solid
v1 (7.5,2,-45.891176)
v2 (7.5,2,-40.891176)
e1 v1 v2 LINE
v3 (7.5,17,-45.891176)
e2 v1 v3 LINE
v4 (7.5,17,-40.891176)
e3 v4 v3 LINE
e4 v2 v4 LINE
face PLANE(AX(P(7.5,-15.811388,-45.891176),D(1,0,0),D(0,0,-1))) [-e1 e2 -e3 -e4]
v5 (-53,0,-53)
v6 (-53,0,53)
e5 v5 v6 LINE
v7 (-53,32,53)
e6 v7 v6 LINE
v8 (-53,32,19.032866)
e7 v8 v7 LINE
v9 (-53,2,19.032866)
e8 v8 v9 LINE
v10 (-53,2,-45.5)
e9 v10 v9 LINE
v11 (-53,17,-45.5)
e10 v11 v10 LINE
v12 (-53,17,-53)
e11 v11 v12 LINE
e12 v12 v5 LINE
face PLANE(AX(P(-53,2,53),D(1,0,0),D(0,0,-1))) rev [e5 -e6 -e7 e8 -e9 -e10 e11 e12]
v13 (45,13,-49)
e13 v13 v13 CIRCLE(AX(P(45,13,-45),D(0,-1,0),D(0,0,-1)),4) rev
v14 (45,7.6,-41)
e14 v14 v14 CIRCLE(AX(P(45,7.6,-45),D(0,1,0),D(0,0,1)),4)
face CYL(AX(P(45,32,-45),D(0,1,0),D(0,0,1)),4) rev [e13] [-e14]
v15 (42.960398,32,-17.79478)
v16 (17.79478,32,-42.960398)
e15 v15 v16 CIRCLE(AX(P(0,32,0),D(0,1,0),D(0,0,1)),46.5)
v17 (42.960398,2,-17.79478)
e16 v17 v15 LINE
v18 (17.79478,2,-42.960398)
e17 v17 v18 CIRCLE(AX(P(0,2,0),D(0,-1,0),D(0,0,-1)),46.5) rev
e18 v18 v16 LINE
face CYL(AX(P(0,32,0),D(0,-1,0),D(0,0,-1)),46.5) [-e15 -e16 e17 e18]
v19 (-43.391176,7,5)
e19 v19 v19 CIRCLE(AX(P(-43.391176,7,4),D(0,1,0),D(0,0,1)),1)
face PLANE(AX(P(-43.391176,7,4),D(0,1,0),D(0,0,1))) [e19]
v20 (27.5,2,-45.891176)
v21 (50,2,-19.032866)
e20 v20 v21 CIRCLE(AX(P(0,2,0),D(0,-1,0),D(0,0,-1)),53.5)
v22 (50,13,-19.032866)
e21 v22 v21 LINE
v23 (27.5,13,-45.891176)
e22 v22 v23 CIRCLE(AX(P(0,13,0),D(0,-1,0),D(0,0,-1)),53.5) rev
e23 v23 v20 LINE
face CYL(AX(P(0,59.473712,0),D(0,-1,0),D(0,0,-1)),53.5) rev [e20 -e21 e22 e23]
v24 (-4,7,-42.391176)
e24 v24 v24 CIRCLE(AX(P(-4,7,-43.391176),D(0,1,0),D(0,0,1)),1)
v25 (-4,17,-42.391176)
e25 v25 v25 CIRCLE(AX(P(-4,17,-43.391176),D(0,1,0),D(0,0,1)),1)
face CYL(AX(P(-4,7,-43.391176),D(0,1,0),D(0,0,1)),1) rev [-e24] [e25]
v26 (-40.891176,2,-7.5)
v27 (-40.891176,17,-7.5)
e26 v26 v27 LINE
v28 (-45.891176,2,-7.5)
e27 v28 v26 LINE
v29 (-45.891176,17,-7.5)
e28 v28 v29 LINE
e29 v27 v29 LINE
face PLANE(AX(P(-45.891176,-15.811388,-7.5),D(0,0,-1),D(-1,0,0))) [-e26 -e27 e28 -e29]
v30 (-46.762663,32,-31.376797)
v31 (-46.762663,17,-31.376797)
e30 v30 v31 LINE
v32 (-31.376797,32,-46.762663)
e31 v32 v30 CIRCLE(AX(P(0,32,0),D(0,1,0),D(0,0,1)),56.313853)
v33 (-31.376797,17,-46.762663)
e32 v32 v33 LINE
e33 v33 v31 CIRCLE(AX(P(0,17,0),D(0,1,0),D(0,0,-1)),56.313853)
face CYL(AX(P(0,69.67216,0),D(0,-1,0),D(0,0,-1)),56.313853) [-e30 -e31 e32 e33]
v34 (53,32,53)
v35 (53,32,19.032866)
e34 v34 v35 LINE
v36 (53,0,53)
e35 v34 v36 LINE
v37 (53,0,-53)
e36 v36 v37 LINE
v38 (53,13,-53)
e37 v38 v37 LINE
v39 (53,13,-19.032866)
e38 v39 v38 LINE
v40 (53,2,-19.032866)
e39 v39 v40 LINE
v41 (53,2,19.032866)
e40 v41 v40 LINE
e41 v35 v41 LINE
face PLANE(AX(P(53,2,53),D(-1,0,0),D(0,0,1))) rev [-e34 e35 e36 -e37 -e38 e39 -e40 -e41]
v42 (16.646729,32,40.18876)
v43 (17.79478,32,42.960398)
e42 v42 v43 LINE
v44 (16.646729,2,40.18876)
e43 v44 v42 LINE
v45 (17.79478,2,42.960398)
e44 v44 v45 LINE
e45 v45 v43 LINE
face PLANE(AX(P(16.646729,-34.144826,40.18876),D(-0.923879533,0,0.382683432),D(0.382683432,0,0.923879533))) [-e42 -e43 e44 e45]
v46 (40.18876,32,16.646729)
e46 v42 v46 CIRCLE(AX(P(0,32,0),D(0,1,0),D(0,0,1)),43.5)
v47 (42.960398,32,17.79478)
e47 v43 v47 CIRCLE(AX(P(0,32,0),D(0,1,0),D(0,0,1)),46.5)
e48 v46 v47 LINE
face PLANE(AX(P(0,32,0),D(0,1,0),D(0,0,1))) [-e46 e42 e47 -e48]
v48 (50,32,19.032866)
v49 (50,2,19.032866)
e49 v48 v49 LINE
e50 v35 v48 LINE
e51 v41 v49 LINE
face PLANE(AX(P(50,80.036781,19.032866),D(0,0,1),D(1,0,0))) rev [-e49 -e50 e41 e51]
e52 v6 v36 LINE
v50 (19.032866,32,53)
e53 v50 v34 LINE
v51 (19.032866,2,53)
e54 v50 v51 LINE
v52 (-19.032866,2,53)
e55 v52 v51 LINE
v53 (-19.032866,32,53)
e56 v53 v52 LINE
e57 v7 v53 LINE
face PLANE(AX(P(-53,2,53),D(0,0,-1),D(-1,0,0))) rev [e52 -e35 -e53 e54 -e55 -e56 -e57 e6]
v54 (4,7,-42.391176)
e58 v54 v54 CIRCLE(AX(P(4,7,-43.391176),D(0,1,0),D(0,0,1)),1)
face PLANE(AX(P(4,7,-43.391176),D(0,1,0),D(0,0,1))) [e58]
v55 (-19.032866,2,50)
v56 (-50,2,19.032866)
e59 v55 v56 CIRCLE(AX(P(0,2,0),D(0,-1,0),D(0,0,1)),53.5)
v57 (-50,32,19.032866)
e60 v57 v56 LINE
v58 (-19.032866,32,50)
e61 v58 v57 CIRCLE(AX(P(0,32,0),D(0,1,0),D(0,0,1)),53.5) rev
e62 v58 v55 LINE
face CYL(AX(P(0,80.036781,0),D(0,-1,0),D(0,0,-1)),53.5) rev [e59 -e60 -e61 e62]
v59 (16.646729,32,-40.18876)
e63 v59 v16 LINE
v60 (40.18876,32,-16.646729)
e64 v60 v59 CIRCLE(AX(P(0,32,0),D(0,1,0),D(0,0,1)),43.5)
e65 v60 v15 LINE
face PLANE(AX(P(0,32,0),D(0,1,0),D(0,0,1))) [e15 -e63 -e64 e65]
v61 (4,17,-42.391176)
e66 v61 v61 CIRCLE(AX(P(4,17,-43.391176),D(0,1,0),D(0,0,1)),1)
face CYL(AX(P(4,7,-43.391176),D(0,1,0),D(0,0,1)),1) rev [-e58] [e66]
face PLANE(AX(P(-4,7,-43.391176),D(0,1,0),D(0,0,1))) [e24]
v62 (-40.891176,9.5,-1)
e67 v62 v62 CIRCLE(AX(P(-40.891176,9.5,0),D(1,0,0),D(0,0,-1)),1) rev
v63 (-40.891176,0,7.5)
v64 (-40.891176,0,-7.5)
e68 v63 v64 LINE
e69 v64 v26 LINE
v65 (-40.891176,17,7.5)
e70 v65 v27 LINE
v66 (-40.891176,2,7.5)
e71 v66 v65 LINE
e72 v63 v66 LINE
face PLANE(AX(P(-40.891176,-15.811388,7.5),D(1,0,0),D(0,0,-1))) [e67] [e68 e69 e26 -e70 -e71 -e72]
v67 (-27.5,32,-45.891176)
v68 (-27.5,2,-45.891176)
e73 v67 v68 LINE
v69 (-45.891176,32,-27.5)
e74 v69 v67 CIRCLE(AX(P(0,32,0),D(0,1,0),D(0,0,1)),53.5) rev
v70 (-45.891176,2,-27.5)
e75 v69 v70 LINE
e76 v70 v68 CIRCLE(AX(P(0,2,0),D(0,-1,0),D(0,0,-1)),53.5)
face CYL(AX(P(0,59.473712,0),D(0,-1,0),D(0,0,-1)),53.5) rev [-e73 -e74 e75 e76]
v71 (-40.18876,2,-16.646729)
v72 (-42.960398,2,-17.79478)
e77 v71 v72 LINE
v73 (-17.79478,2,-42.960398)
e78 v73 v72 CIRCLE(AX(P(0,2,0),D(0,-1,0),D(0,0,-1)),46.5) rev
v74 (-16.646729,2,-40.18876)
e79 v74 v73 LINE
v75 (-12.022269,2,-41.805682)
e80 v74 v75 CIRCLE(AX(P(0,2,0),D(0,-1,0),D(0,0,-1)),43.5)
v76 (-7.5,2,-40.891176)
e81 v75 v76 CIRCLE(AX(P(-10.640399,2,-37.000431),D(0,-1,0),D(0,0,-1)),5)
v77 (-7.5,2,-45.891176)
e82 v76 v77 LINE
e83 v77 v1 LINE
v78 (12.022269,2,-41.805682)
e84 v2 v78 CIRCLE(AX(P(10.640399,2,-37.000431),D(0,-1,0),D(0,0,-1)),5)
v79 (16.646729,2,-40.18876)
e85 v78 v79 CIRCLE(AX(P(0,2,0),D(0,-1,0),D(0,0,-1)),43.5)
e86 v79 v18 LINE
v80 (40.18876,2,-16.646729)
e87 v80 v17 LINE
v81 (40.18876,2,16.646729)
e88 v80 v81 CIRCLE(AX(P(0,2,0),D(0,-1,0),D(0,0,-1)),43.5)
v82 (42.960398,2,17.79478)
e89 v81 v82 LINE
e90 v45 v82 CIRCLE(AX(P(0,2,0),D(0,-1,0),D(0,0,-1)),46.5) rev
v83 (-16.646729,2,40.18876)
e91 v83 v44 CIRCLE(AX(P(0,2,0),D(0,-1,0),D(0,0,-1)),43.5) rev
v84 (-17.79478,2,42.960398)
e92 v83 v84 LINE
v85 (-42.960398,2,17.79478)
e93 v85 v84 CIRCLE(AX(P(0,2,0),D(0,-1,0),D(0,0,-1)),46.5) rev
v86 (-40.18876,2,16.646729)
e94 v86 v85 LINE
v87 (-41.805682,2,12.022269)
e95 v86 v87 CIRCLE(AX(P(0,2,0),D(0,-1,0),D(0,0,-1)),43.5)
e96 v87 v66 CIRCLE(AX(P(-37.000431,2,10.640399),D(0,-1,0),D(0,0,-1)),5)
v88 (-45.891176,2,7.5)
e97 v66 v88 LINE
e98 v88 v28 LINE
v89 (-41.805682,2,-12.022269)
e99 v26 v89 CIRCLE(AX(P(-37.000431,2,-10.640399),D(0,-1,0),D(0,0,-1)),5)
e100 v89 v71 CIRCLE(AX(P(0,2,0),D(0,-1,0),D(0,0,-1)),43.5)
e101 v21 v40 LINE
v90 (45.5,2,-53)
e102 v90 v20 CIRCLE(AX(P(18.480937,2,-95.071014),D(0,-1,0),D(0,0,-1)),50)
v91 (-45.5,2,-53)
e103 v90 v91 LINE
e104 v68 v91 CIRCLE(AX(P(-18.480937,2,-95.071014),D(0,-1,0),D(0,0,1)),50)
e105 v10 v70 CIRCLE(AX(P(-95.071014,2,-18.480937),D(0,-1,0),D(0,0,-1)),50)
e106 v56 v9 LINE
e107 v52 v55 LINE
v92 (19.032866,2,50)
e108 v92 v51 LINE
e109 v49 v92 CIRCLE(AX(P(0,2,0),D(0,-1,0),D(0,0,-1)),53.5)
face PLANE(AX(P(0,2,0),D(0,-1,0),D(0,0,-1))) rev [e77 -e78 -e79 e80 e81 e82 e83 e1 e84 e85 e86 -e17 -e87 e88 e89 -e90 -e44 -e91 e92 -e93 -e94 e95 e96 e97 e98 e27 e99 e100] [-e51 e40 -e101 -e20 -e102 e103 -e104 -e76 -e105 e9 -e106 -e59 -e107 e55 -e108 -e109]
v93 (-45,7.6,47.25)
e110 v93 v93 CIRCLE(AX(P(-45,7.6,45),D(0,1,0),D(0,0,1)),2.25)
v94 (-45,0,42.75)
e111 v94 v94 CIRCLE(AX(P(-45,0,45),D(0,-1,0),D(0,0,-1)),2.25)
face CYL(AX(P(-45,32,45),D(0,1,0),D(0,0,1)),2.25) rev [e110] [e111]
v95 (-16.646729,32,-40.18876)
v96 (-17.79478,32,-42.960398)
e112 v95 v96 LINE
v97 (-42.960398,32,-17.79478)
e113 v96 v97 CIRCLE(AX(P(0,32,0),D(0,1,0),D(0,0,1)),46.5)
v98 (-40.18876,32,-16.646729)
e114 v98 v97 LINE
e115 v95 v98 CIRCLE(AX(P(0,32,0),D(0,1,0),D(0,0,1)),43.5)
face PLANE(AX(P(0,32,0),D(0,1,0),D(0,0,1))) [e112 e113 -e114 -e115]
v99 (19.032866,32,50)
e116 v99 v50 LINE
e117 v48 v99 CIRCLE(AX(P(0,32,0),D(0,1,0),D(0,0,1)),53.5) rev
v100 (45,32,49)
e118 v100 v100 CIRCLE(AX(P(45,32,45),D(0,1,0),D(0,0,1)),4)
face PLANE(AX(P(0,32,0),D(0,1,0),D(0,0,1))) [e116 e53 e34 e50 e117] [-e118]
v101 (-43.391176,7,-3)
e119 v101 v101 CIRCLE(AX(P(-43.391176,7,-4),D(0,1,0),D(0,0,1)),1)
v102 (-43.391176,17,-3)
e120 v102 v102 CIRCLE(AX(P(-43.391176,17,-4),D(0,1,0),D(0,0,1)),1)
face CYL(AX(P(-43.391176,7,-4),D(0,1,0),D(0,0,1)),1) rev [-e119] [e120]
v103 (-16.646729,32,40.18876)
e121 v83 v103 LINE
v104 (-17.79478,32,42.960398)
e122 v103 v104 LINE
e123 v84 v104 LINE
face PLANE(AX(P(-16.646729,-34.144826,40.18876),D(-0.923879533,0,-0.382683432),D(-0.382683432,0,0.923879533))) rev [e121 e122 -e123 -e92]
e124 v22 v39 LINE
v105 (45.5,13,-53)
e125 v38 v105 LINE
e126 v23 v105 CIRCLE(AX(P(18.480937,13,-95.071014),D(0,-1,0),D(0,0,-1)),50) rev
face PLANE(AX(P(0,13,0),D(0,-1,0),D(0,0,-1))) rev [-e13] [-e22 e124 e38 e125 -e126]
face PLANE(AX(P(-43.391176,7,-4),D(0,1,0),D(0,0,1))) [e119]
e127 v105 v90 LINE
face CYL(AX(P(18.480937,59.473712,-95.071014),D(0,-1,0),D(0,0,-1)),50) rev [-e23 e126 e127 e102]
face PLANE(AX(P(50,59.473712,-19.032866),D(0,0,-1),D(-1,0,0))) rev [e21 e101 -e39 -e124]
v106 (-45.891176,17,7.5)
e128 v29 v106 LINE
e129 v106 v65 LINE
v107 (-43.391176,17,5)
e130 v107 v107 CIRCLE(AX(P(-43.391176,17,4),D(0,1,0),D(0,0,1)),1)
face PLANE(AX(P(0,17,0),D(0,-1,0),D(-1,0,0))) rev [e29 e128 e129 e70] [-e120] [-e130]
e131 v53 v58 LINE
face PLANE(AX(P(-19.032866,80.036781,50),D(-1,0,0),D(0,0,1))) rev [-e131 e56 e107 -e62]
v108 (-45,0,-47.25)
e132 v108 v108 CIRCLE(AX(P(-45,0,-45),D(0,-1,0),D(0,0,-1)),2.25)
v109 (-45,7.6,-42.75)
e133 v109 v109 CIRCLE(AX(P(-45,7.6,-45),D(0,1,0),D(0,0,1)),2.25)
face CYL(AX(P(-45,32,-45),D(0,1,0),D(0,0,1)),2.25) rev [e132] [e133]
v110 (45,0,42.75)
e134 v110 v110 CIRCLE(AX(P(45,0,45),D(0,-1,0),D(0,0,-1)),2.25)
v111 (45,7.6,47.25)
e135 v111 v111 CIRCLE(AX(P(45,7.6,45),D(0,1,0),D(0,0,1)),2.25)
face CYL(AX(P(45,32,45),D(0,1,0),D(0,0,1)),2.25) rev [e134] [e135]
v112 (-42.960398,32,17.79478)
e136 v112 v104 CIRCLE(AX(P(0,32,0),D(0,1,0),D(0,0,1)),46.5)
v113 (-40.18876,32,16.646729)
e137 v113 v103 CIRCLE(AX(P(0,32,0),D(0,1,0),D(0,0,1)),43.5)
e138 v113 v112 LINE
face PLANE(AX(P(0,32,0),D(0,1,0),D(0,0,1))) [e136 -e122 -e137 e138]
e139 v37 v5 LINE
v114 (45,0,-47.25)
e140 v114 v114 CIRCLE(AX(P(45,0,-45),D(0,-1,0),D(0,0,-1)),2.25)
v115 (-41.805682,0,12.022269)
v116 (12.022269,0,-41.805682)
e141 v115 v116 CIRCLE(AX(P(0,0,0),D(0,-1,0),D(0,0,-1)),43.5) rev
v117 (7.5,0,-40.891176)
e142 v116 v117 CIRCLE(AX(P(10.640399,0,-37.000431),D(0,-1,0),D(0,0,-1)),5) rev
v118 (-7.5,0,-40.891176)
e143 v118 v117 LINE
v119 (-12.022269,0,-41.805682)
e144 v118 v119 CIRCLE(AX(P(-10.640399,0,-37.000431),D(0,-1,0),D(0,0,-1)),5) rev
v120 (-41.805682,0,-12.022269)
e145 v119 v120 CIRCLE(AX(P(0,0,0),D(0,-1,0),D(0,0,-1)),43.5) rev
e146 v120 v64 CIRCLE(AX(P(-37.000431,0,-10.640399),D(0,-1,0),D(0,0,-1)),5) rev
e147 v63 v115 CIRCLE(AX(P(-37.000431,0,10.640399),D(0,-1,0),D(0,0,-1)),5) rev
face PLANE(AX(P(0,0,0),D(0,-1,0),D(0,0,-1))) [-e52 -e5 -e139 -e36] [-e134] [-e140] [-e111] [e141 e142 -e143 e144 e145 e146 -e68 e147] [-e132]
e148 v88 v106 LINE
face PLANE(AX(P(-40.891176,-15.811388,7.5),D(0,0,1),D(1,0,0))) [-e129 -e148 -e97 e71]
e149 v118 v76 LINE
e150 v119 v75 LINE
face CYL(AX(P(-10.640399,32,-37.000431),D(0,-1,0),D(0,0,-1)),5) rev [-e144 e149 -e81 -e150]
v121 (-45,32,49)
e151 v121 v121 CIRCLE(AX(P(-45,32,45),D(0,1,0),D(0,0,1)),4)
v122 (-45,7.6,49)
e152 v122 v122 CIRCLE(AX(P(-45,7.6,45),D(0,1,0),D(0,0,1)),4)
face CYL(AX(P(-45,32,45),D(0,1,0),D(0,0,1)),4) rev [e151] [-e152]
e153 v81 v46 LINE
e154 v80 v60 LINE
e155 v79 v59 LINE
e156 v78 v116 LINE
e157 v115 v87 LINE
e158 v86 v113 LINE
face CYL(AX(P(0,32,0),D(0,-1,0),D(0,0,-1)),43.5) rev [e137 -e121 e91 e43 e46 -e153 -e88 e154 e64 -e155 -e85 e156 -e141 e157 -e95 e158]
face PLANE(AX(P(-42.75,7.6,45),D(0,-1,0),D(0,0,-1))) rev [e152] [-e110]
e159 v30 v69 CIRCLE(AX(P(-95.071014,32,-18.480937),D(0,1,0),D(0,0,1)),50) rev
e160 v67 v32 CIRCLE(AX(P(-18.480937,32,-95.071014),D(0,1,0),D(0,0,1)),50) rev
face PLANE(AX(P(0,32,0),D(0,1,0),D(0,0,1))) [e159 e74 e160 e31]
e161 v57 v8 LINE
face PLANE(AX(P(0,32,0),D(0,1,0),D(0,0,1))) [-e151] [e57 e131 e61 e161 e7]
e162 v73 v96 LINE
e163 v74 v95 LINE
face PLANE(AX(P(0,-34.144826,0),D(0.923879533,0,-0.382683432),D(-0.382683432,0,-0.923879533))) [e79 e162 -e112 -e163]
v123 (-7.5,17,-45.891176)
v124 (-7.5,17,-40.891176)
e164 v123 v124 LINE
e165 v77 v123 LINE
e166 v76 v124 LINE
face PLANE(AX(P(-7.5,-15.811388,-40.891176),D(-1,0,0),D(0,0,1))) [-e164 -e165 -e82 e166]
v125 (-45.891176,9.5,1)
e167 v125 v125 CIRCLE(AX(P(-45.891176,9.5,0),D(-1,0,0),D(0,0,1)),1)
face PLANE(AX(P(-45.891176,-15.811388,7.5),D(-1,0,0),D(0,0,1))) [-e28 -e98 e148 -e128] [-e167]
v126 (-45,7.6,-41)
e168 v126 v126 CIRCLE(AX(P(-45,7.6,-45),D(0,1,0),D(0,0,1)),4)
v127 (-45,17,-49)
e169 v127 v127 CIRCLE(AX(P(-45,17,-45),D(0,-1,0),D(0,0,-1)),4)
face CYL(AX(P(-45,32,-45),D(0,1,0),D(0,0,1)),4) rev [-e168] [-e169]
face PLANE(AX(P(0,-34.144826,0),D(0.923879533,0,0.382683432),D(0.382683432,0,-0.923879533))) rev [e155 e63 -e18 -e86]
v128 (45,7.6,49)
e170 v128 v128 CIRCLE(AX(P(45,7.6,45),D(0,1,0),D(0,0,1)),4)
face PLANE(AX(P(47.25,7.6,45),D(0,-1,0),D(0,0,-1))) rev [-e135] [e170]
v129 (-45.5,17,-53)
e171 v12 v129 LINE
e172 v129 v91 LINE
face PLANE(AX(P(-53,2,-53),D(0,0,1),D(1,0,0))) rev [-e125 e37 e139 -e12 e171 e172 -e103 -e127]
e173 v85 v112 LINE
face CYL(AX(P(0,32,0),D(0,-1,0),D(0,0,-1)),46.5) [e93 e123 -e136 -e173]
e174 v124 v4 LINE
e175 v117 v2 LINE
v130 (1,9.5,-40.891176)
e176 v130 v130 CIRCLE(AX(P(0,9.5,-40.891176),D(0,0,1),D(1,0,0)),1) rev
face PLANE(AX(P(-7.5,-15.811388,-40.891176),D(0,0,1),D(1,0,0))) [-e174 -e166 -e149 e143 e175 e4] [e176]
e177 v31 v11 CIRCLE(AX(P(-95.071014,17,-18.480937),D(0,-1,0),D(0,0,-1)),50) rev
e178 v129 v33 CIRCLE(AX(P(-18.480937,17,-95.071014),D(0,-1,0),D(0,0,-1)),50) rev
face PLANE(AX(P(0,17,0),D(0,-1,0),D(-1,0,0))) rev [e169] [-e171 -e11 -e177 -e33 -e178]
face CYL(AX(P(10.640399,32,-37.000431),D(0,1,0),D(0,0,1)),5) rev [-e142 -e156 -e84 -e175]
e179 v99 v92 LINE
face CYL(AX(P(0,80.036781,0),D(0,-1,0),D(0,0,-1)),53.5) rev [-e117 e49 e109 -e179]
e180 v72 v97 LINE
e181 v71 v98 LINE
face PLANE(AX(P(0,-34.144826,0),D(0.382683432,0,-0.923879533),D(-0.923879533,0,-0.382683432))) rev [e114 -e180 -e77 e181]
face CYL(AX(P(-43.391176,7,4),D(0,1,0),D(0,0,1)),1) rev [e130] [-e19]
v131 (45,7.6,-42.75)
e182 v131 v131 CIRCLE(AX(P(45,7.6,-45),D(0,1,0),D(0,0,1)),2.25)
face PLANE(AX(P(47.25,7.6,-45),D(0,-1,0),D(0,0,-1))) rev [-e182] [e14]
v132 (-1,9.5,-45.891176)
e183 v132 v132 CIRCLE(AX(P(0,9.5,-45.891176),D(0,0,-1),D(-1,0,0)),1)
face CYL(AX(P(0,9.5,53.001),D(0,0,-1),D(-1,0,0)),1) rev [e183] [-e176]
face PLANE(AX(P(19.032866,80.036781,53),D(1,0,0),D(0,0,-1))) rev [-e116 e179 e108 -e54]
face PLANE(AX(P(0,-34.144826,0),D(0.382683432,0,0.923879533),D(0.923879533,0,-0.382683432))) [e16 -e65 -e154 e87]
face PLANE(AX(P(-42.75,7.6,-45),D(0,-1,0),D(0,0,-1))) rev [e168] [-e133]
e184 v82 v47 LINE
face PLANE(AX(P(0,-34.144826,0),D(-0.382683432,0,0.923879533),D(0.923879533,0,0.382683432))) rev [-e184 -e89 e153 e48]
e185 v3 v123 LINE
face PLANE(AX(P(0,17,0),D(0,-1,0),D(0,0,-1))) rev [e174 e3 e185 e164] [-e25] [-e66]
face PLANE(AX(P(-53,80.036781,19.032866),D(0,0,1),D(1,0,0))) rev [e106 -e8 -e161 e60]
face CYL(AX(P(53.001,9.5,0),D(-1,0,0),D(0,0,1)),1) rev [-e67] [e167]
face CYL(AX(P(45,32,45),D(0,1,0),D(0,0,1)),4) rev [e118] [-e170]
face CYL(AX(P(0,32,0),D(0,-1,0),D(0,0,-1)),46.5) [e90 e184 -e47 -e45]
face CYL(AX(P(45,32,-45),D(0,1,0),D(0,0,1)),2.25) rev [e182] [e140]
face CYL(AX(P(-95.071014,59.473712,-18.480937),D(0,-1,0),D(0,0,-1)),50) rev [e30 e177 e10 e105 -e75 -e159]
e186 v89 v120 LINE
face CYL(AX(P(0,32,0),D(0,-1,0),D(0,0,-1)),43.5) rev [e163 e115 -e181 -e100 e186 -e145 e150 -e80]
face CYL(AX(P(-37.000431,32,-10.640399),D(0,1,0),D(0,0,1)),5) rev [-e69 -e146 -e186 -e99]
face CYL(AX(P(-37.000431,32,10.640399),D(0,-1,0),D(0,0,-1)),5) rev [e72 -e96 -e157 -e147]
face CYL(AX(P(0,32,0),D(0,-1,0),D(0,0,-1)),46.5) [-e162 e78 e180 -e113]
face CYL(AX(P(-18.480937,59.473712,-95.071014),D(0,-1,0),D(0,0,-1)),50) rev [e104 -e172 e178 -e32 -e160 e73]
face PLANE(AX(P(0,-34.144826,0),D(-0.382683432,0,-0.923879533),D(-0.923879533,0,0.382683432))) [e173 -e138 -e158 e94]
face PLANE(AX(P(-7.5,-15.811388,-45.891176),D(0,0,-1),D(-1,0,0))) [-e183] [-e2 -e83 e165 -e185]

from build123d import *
from build123d.topology import SkipClean

# Parameters (mm, degrees)
SKETCH1_W                                           = 106
SKETCH1_H                                           = 106
BOSS_EXTRUDE1_DEPTH                                 = 2
SKETCH2_R                                           = 46.5
SKETCH2_R_2                                         = 43.5
BOSS_EXTRUDE2_DEPTH                                 = 30
CUT_EXTRUDE1_REACH                                  = 82.734
SKETCH3_R                                           = 43.5
CUT_EXTRUDE2_START                                  = -30
CUT_EXTRUDE2_DEPTH                                  = 30
SKETCH5_W                                           = 15
SKETCH5_H                                           = 5
BOSS_EXTRUDE3_DEPTH                                 = 15
BOSS_EXTRUDE3_DIRECTION_2_REACH                     = 82.734
FILLET1_R                                           = 5
CIRPATTERN1_COUNT                                   = 2
CIRPATTERN1_ANGLE                                   = 90
FILLET1_OF_CIRPATTERN1_R                            = 5
BOSS_EXTRUDE4_DEPTH                                 = 30
BOSS_EXTRUDE5_DEPTH                                 = 15
BOSS_EXTRUDE6_DEPTH                                 = 15
CBORE_FOR_M4_HEX_SOCKET_HEAD_CAP_SCREW1_D           = 4.5
CBORE_FOR_M4_HEX_SOCKET_HEAD_CAP_SCREW1_CBORE_D     = 8
CBORE_FOR_M4_HEX_SOCKET_HEAD_CAP_SCREW1_CBORE_DEPTH = 24.4
CUT_EXTRUDE4_DEPTH                                  = 19
CUT_EXTRUDE5_REACH                                  = 118.672
SKETCH15_R                                          = 1
CUT_EXTRUDE6_REACH                                  = 118.672
SKETCH16_R                                          = 1
SKETCH17_R                                          = 1
CUT_EXTRUDE7_DEPTH                                  = 10


with BuildPart() as part:
    # Sketch1 → Boss-Extrude1 (new body)
    with BuildSketch(Plane(origin=(0, 0, 0), x_dir=(1, 0, 0), z_dir=(0, 1, 0))):
        Rectangle(SKETCH1_W, SKETCH1_H)
    extrude(amount=BOSS_EXTRUDE1_DEPTH)

    # Sketch2 → Boss-Extrude2 (add)
    with BuildSketch(Plane(origin=(0, 2, 0), x_dir=(1, 0, 0), z_dir=(0, 1, 0))):
        with Locations(Location((0, 0, 0), (0, 0, 90))):
            Circle(SKETCH2_R)
        with Locations(Location((0, 0, 0), (0, 0, 270))):
            Circle(SKETCH2_R_2, mode=Mode.SUBTRACT)
    extrude(amount=BOSS_EXTRUDE2_DEPTH)

    # Sketch3 → Cut-Extrude1 (cut, up to next)
    with BuildSketch(Plane(origin=(0, 2, 0), x_dir=(1, 0, 0), z_dir=(0, 1, 0)), mode=Mode.PRIVATE) as cut_extrude1_sk1:
        with Locations(Location((0, 0, 0), (0, 0, 90))):
            Circle(SKETCH3_R)
    cut_extrude1_tool1 = extrude(cut_extrude1_sk1.sketch, amount=-CUT_EXTRUDE1_REACH, mode=Mode.PRIVATE) & part.part
    add(cut_extrude1_tool1.solids().sort_by_distance((0, 2, 0))[0], mode=Mode.SUBTRACT)

    # Sketch4 → Cut-Extrude2 (cut)
    with BuildSketch(Plane(origin=(0, 32, 0), x_dir=(1, 0, 0), z_dir=(0, 1, 0)).offset(CUT_EXTRUDE2_START)):
        with BuildLine():
            ThreePointArc((-40.188759664, -16.646729308), (-43.5, 0), (-40.188759664, 16.646729308))
            Line((-40.188759664, 16.646729308), (-42.960398262, 17.794779605))
            ThreePointArc((-42.960398262, 17.794779605), (-46.5, 0), (-42.960398262, -17.794779605))
            Line((-42.960398262, -17.794779605), (-40.188759664, -16.646729308))
        make_face()
        with BuildLine():
            Line((-17.794779605, 42.960398262), (-16.646729308, 40.188759664))
            ThreePointArc((-16.646729308, 40.188759664), (0, 43.5), (16.646729308, 40.188759664))
            Line((16.646729308, 40.188759664), (17.794779605, 42.960398262))
            ThreePointArc((17.794779605, 42.960398262), (0, 46.5), (-17.794779605, 42.960398262))
        make_face()
        with BuildLine():
            Line((42.960398262, 17.794779605), (40.188759664, 16.646729308))
            ThreePointArc((40.188759664, 16.646729308), (42.664159698, 8.486429008), (43.5, 0))
            ThreePointArc((43.5, 0), (42.664159698, -8.486429008), (40.188759664, -16.646729308))
            Line((40.188759664, -16.646729308), (42.960398262, -17.794779605))
            ThreePointArc((42.960398262, -17.794779605), (45.606515539, -9.071699974), (46.5, 0))
            ThreePointArc((46.5, 0), (45.606515539, 9.071699974), (42.960398262, 17.794779605))
        make_face()
        with BuildLine():
            ThreePointArc((-16.646729308, -40.188759664), (0, -43.5), (16.646729308, -40.188759664))
            Line((16.646729308, -40.188759664), (17.794779605, -42.960398262))
            ThreePointArc((17.794779605, -42.960398262), (0, -46.5), (-17.794779605, -42.960398262))
            Line((-17.794779605, -42.960398262), (-16.646729308, -40.188759664))
        make_face()
    extrude(amount=CUT_EXTRUDE2_DEPTH, mode=Mode.SUBTRACT)

    # Sketch5 → Boss-Extrude3 (add)
    with SkipClean():  # the faces are left unmerged after this step: merging them gives an invalid solid
        with BuildSketch(Plane(origin=(0, 2, 0), x_dir=(1, 0, 0), z_dir=(0, 1, 0))):
            with Locations((0, 43.391175622)):
                Rectangle(SKETCH5_W, SKETCH5_H)
        boss_extrude3 = extrude(amount=BOSS_EXTRUDE3_DEPTH)

    # Boss-Extrude3 direction 2: up to this face of the body (flat: up to its plane)
    boss_extrude3_direction_2_end = Plane(part.part.faces().sort_by_distance((0, 0, 51.500933624))[0])
    # Sketch5 → Boss-Extrude3 direction 2 (add, up to the picked face)
    with BuildSketch(Plane(origin=(0, 2, 0), x_dir=(1, 0, 0), z_dir=(0, 1, 0)), mode=Mode.PRIVATE) as boss_extrude3_direction_2_sk1:
        with Locations((0, 43.391175622)):
            Rectangle(SKETCH5_W, SKETCH5_H)
    boss_extrude3_direction_2_tool1 = split(extrude(boss_extrude3_direction_2_sk1.sketch, amount=-BOSS_EXTRUDE3_DIRECTION_2_REACH, mode=Mode.PRIVATE), bisect_by=boss_extrude3_direction_2_end, keep=Keep.BOTH, mode=Mode.PRIVATE)
    boss_extrude3_direction_2 = boss_extrude3_direction_2_tool1.solids().sort_by(Axis((0, 2, -43.391176), (0, -1, 0)))[0]
    add(boss_extrude3_direction_2)

    # Fillet1
    # the kernel refuses this fillet: 5 mm, written as the material it adds along each edge
    with BuildSketch(Plane(origin=(7.5, 0, -42.848570571), x_dir=(0.9744247966149427, 0, 0.2247138530263045), z_dir=(0, 1, 0))) as fillet1_piece_1:
        with BuildLine():
            CenterArc((4.374240829, -4.992880869), FILLET1_R, 86.942139574, 54.952511428)
            Line((0.439853761, -1.907334175), (0.36116602, -1.845623241))
            ThreePointArc((0.36116602, -1.845623241), (0.122484401, -0.976138473), (-0.09744248, -0.022471385))
            Line((-0.09744248, -0.022471385), (-0.00533444, 0.099857617))
            ThreePointArc((-0.00533444, 0.099857617), (2.320481415, 0.161936438), (4.64629727, 0.099857617))
            Line((4.64629727, 0.099857617), (4.64096283, 0))
        make_face()
    extrude(amount=2)
    with BuildSketch(Plane(origin=(-7.5, 0, -42.848570571), x_dir=(-0.9744247966149427, 0, 0.2247138530263046), z_dir=(0, 1, 0))) as fillet1_piece_2:
        with BuildLine():
            CenterArc((4.374240829, 4.992880869), FILLET1_R, 218.105348998, 54.952511428)
            Line((0.439853761, 1.907334175), (0.36116602, 1.845623241))
            ThreePointArc((0.36116602, 1.845623241), (0.122484401, 0.976138473), (-0.09744248, 0.022471385))
            Line((-0.09744248, 0.022471385), (-0.00533444, -0.099857617))
            ThreePointArc((-0.00533444, -0.099857617), (2.320481415, -0.161936438), (4.64629727, -0.099857617))
            Line((4.64629727, -0.099857617), (4.64096283, 0))
        make_face()
    extrude(amount=2)

    # CirPattern1: Boss-Extrude3, Boss-Extrude3 direction 2 ×2 about axis
    cirpattern1_axis = Axis((0, 0, 0), (0, 1, 0))
    add([boss_extrude3.rotate(cirpattern1_axis, i * CIRPATTERN1_ANGLE / (CIRPATTERN1_COUNT - 1)) for i in range(1, CIRPATTERN1_COUNT)])
    add([boss_extrude3_direction_2.rotate(cirpattern1_axis, i * CIRPATTERN1_ANGLE / (CIRPATTERN1_COUNT - 1)) for i in range(1, CIRPATTERN1_COUNT)])

    # Fillet1 of CirPattern1
    # the kernel refuses this fillet: 5 mm, written as the material it adds along each edge
    with BuildSketch(Plane(origin=(-42.848570571, 0, -7.5), x_dir=(1, 0, 0), z_dir=(0, 1, 0))) as fillet1_of_cirpattern1_piece_1:
        with BuildLine():
            CenterArc((5.848139436, 3.140399232), FILLET1_OF_CIRPATTERN1_R, 163.956087306, 54.952511428)
            Line((1.042888639, 4.522269262), (0.946783623, 4.549906663))
            ThreePointArc((0.946783623, 4.549906663), (0.363649439, 2.297523992), (-0.098502461, 0.017241379))
            Line((-0.098502461, 0.017241379), (0, -0.1))
            ThreePointArc((0, -0.1), (0.978697474, -0.1), (1.879580059, -0.062807985))
            Line((1.879580059, -0.062807985), (1.957394949, 0))
        make_face()
    extrude(amount=2)
    with BuildSketch(Plane(origin=(-42.848570571, 0, 7.5), x_dir=(0.22471385302630772, 0, 0.974424796614942), z_dir=(0, 1, 0))) as fillet1_of_cirpattern1_piece_2:
        with BuildLine():
            CenterArc((4.374240829, 4.992880869), FILLET1_OF_CIRPATTERN1_R, 218.105348998, 54.952511428)
            Line((0.439853761, 1.907334175), (0.36116602, 1.845623241))
            ThreePointArc((0.36116602, 1.845623241), (0.122484401, 0.976138473), (-0.09744248, 0.022471385))
            Line((-0.09744248, 0.022471385), (-0.00533444, -0.099857617))
            ThreePointArc((-0.00533444, -0.099857617), (2.320481415, -0.161936438), (4.64629727, -0.099857617))
            Line((4.64629727, -0.099857617), (4.64096283, 0))
        make_face()
    extrude(amount=2)

    # Sketch6 → Boss-Extrude4 (add)
    with BuildSketch(Plane(origin=(0, 2, 0), x_dir=(1, 0, 0), z_dir=(0, 1, 0))):
        with BuildLine():
            Line((50, -19.032866311), (53, -19.032866311))
            Line((53, -19.032866311), (53, -53))
            Line((53, -53), (19.032866311, -53))
            Line((19.032866311, -53), (19.032866311, -50))
            ThreePointArc((19.032866311, -50), (37.830212793, -37.830212793), (50, -19.032866311))
        make_face()
        with BuildLine():
            Line((-19.032866311, -50), (-19.032866311, -53))
            Line((-19.032866311, -53), (-53, -53))
            Line((-53, -53), (-53, -19.032866311))
            Line((-53, -19.032866311), (-50, -19.032866311))
            ThreePointArc((-50, -19.032866311), (-37.830212793, -37.830212793), (-19.032866311, -50))
        make_face()
    extrude(amount=BOSS_EXTRUDE4_DEPTH)

    # Sketch8 → Boss-Extrude5 (add)
    with BuildSketch(Plane(origin=(0, 2, 0), x_dir=(1, 0, 0), z_dir=(0, 1, 0))):
        with BuildLine():
            Line((-53, 53), (-45.5, 53))
            ThreePointArc((-45.5, 53), (-36.847223427, 48.566395788), (-27.5, 45.891175622))
            ThreePointArc((-27.5, 45.891175622), (-37.830212793, 37.830212793), (-45.891175622, 27.5))
            ThreePointArc((-45.891175622, 27.5), (-48.566395788, 36.847223427), (-53, 45.5))
            Line((-53, 45.5), (-53, 53))
        make_face()
        with BuildLine():
            Line((50, 19.032866311), (53, 19.032866311))
            Line((53, 19.032866311), (53, 53))
            Line((53, 53), (45.5, 53))
            ThreePointArc((45.5, 53), (36.847223427, 48.566395788), (27.5, 45.891175622))
            ThreePointArc((27.5, 45.891175622), (41.011031379, 34.356153819), (50, 19.032866311))
        make_face()
    extrude(amount=BOSS_EXTRUDE5_DEPTH)

    # Sketch9 → Boss-Extrude6 (add)
    with BuildSketch(Plane(origin=(0, 17, 0), x_dir=(1, 0, 0), z_dir=(0, 1, 0))):
        with BuildLine():
            Line((50, 19.032866311), (53, 19.032866311))
            ThreePointArc((53, 19.032866311), (44.40829155, 34.628797866), (31.376796705, 46.762662761))
            ThreePointArc((31.376796705, 46.762662761), (29.447059001, 46.288392434), (27.5, 45.891175622))
            ThreePointArc((27.5, 45.891175622), (41.011031379, 34.356153819), (50, 19.032866311))
        make_face()
        with BuildLine():
            ThreePointArc((-45.891175622, 27.5), (-37.830212793, 37.830212793), (-27.5, 45.891175622))
            ThreePointArc((-27.5, 45.891175622), (-29.447059001, 46.288392434), (-31.376796705, 46.762662761))
            ThreePointArc((-31.376796705, 46.762662761), (-39.819907082, 39.819907082), (-46.762662761, 31.376796705))
            ThreePointArc((-46.762662761, 31.376796705), (-46.288392434, 29.447059001), (-45.891175622, 27.5))
        make_face()
    extrude(amount=BOSS_EXTRUDE6_DEPTH)

    # CBORE for M4 Hex Socket Head Cap Screw1 (through all)
    with Locations(Plane(origin=(0, 32, 0), x_dir=(1, 0, 0), z_dir=(0, 1, 0))):
        with Locations((-45, -45), (45, -45), (45, 45), (-45, 45)):
            CounterBoreHole(CBORE_FOR_M4_HEX_SOCKET_HEAD_CAP_SCREW1_D / 2, CBORE_FOR_M4_HEX_SOCKET_HEAD_CAP_SCREW1_CBORE_D / 2, CBORE_FOR_M4_HEX_SOCKET_HEAD_CAP_SCREW1_CBORE_DEPTH)

    # Sketch14 → Cut-Extrude4 (cut)
    with BuildSketch(Plane(origin=(0, 32, 0), x_dir=(1, 0, 0), z_dir=(0, 1, 0))):
        Polygon((50, 19.032866311), (53, 19.032866311), (53, 53), (45.5, 53), (27.5, 45.891175622), align=None)
    extrude(amount=-CUT_EXTRUDE4_DEPTH, mode=Mode.SUBTRACT)

    # Sketch15 → Cut-Extrude5 (cut, up to next)
    with BuildSketch(Plane(origin=(0, 0, -45.891175622), x_dir=(-1, 0, 0), z_dir=(0, 0, -1)), mode=Mode.PRIVATE) as cut_extrude5_sk1:
        with Locations((0, 9.5)):
            Circle(SKETCH15_R)
    cut_extrude5_tool1 = extrude(cut_extrude5_sk1.sketch, amount=-CUT_EXTRUDE5_REACH, mode=Mode.PRIVATE) & part.part
    add(cut_extrude5_tool1.solids().sort_by_distance((0, 9.5, -45.891176))[0], mode=Mode.SUBTRACT)

    # Sketch16 → Cut-Extrude6 (cut, up to next)
    with BuildSketch(Plane.ZY.offset(45.891175622), mode=Mode.PRIVATE) as cut_extrude6_sk1:
        with Locations((0, 9.5)):
            Circle(SKETCH16_R)
    cut_extrude6_tool1 = extrude(cut_extrude6_sk1.sketch, amount=-CUT_EXTRUDE6_REACH, mode=Mode.PRIVATE) & part.part
    add(cut_extrude6_tool1.solids().sort_by_distance((-45.891176, 9.5, 0))[0], mode=Mode.SUBTRACT)

    # Sketch17 → Cut-Extrude7 (cut)
    with BuildSketch(Plane(origin=(0, 17, 0), x_dir=(1, 0, 0), z_dir=(0, 1, 0))):
        with Locations(Location((4, 43.391175622, 0), (0, 0, 270))):
            Circle(SKETCH17_R)
        with Locations(Location((-4, 43.391175622, 0), (0, 0, 270))):
            Circle(SKETCH17_R)
        with Locations(Location((-43.391175622, 4, 0), (0, 0, 270))):
            Circle(SKETCH17_R)
        with Locations(Location((-43.391175622, -4, 0), (0, 0, 270))):
            Circle(SKETCH17_R)
    extrude(amount=-CUT_EXTRUDE7_DEPTH, mode=Mode.SUBTRACT)


solid = part.part
